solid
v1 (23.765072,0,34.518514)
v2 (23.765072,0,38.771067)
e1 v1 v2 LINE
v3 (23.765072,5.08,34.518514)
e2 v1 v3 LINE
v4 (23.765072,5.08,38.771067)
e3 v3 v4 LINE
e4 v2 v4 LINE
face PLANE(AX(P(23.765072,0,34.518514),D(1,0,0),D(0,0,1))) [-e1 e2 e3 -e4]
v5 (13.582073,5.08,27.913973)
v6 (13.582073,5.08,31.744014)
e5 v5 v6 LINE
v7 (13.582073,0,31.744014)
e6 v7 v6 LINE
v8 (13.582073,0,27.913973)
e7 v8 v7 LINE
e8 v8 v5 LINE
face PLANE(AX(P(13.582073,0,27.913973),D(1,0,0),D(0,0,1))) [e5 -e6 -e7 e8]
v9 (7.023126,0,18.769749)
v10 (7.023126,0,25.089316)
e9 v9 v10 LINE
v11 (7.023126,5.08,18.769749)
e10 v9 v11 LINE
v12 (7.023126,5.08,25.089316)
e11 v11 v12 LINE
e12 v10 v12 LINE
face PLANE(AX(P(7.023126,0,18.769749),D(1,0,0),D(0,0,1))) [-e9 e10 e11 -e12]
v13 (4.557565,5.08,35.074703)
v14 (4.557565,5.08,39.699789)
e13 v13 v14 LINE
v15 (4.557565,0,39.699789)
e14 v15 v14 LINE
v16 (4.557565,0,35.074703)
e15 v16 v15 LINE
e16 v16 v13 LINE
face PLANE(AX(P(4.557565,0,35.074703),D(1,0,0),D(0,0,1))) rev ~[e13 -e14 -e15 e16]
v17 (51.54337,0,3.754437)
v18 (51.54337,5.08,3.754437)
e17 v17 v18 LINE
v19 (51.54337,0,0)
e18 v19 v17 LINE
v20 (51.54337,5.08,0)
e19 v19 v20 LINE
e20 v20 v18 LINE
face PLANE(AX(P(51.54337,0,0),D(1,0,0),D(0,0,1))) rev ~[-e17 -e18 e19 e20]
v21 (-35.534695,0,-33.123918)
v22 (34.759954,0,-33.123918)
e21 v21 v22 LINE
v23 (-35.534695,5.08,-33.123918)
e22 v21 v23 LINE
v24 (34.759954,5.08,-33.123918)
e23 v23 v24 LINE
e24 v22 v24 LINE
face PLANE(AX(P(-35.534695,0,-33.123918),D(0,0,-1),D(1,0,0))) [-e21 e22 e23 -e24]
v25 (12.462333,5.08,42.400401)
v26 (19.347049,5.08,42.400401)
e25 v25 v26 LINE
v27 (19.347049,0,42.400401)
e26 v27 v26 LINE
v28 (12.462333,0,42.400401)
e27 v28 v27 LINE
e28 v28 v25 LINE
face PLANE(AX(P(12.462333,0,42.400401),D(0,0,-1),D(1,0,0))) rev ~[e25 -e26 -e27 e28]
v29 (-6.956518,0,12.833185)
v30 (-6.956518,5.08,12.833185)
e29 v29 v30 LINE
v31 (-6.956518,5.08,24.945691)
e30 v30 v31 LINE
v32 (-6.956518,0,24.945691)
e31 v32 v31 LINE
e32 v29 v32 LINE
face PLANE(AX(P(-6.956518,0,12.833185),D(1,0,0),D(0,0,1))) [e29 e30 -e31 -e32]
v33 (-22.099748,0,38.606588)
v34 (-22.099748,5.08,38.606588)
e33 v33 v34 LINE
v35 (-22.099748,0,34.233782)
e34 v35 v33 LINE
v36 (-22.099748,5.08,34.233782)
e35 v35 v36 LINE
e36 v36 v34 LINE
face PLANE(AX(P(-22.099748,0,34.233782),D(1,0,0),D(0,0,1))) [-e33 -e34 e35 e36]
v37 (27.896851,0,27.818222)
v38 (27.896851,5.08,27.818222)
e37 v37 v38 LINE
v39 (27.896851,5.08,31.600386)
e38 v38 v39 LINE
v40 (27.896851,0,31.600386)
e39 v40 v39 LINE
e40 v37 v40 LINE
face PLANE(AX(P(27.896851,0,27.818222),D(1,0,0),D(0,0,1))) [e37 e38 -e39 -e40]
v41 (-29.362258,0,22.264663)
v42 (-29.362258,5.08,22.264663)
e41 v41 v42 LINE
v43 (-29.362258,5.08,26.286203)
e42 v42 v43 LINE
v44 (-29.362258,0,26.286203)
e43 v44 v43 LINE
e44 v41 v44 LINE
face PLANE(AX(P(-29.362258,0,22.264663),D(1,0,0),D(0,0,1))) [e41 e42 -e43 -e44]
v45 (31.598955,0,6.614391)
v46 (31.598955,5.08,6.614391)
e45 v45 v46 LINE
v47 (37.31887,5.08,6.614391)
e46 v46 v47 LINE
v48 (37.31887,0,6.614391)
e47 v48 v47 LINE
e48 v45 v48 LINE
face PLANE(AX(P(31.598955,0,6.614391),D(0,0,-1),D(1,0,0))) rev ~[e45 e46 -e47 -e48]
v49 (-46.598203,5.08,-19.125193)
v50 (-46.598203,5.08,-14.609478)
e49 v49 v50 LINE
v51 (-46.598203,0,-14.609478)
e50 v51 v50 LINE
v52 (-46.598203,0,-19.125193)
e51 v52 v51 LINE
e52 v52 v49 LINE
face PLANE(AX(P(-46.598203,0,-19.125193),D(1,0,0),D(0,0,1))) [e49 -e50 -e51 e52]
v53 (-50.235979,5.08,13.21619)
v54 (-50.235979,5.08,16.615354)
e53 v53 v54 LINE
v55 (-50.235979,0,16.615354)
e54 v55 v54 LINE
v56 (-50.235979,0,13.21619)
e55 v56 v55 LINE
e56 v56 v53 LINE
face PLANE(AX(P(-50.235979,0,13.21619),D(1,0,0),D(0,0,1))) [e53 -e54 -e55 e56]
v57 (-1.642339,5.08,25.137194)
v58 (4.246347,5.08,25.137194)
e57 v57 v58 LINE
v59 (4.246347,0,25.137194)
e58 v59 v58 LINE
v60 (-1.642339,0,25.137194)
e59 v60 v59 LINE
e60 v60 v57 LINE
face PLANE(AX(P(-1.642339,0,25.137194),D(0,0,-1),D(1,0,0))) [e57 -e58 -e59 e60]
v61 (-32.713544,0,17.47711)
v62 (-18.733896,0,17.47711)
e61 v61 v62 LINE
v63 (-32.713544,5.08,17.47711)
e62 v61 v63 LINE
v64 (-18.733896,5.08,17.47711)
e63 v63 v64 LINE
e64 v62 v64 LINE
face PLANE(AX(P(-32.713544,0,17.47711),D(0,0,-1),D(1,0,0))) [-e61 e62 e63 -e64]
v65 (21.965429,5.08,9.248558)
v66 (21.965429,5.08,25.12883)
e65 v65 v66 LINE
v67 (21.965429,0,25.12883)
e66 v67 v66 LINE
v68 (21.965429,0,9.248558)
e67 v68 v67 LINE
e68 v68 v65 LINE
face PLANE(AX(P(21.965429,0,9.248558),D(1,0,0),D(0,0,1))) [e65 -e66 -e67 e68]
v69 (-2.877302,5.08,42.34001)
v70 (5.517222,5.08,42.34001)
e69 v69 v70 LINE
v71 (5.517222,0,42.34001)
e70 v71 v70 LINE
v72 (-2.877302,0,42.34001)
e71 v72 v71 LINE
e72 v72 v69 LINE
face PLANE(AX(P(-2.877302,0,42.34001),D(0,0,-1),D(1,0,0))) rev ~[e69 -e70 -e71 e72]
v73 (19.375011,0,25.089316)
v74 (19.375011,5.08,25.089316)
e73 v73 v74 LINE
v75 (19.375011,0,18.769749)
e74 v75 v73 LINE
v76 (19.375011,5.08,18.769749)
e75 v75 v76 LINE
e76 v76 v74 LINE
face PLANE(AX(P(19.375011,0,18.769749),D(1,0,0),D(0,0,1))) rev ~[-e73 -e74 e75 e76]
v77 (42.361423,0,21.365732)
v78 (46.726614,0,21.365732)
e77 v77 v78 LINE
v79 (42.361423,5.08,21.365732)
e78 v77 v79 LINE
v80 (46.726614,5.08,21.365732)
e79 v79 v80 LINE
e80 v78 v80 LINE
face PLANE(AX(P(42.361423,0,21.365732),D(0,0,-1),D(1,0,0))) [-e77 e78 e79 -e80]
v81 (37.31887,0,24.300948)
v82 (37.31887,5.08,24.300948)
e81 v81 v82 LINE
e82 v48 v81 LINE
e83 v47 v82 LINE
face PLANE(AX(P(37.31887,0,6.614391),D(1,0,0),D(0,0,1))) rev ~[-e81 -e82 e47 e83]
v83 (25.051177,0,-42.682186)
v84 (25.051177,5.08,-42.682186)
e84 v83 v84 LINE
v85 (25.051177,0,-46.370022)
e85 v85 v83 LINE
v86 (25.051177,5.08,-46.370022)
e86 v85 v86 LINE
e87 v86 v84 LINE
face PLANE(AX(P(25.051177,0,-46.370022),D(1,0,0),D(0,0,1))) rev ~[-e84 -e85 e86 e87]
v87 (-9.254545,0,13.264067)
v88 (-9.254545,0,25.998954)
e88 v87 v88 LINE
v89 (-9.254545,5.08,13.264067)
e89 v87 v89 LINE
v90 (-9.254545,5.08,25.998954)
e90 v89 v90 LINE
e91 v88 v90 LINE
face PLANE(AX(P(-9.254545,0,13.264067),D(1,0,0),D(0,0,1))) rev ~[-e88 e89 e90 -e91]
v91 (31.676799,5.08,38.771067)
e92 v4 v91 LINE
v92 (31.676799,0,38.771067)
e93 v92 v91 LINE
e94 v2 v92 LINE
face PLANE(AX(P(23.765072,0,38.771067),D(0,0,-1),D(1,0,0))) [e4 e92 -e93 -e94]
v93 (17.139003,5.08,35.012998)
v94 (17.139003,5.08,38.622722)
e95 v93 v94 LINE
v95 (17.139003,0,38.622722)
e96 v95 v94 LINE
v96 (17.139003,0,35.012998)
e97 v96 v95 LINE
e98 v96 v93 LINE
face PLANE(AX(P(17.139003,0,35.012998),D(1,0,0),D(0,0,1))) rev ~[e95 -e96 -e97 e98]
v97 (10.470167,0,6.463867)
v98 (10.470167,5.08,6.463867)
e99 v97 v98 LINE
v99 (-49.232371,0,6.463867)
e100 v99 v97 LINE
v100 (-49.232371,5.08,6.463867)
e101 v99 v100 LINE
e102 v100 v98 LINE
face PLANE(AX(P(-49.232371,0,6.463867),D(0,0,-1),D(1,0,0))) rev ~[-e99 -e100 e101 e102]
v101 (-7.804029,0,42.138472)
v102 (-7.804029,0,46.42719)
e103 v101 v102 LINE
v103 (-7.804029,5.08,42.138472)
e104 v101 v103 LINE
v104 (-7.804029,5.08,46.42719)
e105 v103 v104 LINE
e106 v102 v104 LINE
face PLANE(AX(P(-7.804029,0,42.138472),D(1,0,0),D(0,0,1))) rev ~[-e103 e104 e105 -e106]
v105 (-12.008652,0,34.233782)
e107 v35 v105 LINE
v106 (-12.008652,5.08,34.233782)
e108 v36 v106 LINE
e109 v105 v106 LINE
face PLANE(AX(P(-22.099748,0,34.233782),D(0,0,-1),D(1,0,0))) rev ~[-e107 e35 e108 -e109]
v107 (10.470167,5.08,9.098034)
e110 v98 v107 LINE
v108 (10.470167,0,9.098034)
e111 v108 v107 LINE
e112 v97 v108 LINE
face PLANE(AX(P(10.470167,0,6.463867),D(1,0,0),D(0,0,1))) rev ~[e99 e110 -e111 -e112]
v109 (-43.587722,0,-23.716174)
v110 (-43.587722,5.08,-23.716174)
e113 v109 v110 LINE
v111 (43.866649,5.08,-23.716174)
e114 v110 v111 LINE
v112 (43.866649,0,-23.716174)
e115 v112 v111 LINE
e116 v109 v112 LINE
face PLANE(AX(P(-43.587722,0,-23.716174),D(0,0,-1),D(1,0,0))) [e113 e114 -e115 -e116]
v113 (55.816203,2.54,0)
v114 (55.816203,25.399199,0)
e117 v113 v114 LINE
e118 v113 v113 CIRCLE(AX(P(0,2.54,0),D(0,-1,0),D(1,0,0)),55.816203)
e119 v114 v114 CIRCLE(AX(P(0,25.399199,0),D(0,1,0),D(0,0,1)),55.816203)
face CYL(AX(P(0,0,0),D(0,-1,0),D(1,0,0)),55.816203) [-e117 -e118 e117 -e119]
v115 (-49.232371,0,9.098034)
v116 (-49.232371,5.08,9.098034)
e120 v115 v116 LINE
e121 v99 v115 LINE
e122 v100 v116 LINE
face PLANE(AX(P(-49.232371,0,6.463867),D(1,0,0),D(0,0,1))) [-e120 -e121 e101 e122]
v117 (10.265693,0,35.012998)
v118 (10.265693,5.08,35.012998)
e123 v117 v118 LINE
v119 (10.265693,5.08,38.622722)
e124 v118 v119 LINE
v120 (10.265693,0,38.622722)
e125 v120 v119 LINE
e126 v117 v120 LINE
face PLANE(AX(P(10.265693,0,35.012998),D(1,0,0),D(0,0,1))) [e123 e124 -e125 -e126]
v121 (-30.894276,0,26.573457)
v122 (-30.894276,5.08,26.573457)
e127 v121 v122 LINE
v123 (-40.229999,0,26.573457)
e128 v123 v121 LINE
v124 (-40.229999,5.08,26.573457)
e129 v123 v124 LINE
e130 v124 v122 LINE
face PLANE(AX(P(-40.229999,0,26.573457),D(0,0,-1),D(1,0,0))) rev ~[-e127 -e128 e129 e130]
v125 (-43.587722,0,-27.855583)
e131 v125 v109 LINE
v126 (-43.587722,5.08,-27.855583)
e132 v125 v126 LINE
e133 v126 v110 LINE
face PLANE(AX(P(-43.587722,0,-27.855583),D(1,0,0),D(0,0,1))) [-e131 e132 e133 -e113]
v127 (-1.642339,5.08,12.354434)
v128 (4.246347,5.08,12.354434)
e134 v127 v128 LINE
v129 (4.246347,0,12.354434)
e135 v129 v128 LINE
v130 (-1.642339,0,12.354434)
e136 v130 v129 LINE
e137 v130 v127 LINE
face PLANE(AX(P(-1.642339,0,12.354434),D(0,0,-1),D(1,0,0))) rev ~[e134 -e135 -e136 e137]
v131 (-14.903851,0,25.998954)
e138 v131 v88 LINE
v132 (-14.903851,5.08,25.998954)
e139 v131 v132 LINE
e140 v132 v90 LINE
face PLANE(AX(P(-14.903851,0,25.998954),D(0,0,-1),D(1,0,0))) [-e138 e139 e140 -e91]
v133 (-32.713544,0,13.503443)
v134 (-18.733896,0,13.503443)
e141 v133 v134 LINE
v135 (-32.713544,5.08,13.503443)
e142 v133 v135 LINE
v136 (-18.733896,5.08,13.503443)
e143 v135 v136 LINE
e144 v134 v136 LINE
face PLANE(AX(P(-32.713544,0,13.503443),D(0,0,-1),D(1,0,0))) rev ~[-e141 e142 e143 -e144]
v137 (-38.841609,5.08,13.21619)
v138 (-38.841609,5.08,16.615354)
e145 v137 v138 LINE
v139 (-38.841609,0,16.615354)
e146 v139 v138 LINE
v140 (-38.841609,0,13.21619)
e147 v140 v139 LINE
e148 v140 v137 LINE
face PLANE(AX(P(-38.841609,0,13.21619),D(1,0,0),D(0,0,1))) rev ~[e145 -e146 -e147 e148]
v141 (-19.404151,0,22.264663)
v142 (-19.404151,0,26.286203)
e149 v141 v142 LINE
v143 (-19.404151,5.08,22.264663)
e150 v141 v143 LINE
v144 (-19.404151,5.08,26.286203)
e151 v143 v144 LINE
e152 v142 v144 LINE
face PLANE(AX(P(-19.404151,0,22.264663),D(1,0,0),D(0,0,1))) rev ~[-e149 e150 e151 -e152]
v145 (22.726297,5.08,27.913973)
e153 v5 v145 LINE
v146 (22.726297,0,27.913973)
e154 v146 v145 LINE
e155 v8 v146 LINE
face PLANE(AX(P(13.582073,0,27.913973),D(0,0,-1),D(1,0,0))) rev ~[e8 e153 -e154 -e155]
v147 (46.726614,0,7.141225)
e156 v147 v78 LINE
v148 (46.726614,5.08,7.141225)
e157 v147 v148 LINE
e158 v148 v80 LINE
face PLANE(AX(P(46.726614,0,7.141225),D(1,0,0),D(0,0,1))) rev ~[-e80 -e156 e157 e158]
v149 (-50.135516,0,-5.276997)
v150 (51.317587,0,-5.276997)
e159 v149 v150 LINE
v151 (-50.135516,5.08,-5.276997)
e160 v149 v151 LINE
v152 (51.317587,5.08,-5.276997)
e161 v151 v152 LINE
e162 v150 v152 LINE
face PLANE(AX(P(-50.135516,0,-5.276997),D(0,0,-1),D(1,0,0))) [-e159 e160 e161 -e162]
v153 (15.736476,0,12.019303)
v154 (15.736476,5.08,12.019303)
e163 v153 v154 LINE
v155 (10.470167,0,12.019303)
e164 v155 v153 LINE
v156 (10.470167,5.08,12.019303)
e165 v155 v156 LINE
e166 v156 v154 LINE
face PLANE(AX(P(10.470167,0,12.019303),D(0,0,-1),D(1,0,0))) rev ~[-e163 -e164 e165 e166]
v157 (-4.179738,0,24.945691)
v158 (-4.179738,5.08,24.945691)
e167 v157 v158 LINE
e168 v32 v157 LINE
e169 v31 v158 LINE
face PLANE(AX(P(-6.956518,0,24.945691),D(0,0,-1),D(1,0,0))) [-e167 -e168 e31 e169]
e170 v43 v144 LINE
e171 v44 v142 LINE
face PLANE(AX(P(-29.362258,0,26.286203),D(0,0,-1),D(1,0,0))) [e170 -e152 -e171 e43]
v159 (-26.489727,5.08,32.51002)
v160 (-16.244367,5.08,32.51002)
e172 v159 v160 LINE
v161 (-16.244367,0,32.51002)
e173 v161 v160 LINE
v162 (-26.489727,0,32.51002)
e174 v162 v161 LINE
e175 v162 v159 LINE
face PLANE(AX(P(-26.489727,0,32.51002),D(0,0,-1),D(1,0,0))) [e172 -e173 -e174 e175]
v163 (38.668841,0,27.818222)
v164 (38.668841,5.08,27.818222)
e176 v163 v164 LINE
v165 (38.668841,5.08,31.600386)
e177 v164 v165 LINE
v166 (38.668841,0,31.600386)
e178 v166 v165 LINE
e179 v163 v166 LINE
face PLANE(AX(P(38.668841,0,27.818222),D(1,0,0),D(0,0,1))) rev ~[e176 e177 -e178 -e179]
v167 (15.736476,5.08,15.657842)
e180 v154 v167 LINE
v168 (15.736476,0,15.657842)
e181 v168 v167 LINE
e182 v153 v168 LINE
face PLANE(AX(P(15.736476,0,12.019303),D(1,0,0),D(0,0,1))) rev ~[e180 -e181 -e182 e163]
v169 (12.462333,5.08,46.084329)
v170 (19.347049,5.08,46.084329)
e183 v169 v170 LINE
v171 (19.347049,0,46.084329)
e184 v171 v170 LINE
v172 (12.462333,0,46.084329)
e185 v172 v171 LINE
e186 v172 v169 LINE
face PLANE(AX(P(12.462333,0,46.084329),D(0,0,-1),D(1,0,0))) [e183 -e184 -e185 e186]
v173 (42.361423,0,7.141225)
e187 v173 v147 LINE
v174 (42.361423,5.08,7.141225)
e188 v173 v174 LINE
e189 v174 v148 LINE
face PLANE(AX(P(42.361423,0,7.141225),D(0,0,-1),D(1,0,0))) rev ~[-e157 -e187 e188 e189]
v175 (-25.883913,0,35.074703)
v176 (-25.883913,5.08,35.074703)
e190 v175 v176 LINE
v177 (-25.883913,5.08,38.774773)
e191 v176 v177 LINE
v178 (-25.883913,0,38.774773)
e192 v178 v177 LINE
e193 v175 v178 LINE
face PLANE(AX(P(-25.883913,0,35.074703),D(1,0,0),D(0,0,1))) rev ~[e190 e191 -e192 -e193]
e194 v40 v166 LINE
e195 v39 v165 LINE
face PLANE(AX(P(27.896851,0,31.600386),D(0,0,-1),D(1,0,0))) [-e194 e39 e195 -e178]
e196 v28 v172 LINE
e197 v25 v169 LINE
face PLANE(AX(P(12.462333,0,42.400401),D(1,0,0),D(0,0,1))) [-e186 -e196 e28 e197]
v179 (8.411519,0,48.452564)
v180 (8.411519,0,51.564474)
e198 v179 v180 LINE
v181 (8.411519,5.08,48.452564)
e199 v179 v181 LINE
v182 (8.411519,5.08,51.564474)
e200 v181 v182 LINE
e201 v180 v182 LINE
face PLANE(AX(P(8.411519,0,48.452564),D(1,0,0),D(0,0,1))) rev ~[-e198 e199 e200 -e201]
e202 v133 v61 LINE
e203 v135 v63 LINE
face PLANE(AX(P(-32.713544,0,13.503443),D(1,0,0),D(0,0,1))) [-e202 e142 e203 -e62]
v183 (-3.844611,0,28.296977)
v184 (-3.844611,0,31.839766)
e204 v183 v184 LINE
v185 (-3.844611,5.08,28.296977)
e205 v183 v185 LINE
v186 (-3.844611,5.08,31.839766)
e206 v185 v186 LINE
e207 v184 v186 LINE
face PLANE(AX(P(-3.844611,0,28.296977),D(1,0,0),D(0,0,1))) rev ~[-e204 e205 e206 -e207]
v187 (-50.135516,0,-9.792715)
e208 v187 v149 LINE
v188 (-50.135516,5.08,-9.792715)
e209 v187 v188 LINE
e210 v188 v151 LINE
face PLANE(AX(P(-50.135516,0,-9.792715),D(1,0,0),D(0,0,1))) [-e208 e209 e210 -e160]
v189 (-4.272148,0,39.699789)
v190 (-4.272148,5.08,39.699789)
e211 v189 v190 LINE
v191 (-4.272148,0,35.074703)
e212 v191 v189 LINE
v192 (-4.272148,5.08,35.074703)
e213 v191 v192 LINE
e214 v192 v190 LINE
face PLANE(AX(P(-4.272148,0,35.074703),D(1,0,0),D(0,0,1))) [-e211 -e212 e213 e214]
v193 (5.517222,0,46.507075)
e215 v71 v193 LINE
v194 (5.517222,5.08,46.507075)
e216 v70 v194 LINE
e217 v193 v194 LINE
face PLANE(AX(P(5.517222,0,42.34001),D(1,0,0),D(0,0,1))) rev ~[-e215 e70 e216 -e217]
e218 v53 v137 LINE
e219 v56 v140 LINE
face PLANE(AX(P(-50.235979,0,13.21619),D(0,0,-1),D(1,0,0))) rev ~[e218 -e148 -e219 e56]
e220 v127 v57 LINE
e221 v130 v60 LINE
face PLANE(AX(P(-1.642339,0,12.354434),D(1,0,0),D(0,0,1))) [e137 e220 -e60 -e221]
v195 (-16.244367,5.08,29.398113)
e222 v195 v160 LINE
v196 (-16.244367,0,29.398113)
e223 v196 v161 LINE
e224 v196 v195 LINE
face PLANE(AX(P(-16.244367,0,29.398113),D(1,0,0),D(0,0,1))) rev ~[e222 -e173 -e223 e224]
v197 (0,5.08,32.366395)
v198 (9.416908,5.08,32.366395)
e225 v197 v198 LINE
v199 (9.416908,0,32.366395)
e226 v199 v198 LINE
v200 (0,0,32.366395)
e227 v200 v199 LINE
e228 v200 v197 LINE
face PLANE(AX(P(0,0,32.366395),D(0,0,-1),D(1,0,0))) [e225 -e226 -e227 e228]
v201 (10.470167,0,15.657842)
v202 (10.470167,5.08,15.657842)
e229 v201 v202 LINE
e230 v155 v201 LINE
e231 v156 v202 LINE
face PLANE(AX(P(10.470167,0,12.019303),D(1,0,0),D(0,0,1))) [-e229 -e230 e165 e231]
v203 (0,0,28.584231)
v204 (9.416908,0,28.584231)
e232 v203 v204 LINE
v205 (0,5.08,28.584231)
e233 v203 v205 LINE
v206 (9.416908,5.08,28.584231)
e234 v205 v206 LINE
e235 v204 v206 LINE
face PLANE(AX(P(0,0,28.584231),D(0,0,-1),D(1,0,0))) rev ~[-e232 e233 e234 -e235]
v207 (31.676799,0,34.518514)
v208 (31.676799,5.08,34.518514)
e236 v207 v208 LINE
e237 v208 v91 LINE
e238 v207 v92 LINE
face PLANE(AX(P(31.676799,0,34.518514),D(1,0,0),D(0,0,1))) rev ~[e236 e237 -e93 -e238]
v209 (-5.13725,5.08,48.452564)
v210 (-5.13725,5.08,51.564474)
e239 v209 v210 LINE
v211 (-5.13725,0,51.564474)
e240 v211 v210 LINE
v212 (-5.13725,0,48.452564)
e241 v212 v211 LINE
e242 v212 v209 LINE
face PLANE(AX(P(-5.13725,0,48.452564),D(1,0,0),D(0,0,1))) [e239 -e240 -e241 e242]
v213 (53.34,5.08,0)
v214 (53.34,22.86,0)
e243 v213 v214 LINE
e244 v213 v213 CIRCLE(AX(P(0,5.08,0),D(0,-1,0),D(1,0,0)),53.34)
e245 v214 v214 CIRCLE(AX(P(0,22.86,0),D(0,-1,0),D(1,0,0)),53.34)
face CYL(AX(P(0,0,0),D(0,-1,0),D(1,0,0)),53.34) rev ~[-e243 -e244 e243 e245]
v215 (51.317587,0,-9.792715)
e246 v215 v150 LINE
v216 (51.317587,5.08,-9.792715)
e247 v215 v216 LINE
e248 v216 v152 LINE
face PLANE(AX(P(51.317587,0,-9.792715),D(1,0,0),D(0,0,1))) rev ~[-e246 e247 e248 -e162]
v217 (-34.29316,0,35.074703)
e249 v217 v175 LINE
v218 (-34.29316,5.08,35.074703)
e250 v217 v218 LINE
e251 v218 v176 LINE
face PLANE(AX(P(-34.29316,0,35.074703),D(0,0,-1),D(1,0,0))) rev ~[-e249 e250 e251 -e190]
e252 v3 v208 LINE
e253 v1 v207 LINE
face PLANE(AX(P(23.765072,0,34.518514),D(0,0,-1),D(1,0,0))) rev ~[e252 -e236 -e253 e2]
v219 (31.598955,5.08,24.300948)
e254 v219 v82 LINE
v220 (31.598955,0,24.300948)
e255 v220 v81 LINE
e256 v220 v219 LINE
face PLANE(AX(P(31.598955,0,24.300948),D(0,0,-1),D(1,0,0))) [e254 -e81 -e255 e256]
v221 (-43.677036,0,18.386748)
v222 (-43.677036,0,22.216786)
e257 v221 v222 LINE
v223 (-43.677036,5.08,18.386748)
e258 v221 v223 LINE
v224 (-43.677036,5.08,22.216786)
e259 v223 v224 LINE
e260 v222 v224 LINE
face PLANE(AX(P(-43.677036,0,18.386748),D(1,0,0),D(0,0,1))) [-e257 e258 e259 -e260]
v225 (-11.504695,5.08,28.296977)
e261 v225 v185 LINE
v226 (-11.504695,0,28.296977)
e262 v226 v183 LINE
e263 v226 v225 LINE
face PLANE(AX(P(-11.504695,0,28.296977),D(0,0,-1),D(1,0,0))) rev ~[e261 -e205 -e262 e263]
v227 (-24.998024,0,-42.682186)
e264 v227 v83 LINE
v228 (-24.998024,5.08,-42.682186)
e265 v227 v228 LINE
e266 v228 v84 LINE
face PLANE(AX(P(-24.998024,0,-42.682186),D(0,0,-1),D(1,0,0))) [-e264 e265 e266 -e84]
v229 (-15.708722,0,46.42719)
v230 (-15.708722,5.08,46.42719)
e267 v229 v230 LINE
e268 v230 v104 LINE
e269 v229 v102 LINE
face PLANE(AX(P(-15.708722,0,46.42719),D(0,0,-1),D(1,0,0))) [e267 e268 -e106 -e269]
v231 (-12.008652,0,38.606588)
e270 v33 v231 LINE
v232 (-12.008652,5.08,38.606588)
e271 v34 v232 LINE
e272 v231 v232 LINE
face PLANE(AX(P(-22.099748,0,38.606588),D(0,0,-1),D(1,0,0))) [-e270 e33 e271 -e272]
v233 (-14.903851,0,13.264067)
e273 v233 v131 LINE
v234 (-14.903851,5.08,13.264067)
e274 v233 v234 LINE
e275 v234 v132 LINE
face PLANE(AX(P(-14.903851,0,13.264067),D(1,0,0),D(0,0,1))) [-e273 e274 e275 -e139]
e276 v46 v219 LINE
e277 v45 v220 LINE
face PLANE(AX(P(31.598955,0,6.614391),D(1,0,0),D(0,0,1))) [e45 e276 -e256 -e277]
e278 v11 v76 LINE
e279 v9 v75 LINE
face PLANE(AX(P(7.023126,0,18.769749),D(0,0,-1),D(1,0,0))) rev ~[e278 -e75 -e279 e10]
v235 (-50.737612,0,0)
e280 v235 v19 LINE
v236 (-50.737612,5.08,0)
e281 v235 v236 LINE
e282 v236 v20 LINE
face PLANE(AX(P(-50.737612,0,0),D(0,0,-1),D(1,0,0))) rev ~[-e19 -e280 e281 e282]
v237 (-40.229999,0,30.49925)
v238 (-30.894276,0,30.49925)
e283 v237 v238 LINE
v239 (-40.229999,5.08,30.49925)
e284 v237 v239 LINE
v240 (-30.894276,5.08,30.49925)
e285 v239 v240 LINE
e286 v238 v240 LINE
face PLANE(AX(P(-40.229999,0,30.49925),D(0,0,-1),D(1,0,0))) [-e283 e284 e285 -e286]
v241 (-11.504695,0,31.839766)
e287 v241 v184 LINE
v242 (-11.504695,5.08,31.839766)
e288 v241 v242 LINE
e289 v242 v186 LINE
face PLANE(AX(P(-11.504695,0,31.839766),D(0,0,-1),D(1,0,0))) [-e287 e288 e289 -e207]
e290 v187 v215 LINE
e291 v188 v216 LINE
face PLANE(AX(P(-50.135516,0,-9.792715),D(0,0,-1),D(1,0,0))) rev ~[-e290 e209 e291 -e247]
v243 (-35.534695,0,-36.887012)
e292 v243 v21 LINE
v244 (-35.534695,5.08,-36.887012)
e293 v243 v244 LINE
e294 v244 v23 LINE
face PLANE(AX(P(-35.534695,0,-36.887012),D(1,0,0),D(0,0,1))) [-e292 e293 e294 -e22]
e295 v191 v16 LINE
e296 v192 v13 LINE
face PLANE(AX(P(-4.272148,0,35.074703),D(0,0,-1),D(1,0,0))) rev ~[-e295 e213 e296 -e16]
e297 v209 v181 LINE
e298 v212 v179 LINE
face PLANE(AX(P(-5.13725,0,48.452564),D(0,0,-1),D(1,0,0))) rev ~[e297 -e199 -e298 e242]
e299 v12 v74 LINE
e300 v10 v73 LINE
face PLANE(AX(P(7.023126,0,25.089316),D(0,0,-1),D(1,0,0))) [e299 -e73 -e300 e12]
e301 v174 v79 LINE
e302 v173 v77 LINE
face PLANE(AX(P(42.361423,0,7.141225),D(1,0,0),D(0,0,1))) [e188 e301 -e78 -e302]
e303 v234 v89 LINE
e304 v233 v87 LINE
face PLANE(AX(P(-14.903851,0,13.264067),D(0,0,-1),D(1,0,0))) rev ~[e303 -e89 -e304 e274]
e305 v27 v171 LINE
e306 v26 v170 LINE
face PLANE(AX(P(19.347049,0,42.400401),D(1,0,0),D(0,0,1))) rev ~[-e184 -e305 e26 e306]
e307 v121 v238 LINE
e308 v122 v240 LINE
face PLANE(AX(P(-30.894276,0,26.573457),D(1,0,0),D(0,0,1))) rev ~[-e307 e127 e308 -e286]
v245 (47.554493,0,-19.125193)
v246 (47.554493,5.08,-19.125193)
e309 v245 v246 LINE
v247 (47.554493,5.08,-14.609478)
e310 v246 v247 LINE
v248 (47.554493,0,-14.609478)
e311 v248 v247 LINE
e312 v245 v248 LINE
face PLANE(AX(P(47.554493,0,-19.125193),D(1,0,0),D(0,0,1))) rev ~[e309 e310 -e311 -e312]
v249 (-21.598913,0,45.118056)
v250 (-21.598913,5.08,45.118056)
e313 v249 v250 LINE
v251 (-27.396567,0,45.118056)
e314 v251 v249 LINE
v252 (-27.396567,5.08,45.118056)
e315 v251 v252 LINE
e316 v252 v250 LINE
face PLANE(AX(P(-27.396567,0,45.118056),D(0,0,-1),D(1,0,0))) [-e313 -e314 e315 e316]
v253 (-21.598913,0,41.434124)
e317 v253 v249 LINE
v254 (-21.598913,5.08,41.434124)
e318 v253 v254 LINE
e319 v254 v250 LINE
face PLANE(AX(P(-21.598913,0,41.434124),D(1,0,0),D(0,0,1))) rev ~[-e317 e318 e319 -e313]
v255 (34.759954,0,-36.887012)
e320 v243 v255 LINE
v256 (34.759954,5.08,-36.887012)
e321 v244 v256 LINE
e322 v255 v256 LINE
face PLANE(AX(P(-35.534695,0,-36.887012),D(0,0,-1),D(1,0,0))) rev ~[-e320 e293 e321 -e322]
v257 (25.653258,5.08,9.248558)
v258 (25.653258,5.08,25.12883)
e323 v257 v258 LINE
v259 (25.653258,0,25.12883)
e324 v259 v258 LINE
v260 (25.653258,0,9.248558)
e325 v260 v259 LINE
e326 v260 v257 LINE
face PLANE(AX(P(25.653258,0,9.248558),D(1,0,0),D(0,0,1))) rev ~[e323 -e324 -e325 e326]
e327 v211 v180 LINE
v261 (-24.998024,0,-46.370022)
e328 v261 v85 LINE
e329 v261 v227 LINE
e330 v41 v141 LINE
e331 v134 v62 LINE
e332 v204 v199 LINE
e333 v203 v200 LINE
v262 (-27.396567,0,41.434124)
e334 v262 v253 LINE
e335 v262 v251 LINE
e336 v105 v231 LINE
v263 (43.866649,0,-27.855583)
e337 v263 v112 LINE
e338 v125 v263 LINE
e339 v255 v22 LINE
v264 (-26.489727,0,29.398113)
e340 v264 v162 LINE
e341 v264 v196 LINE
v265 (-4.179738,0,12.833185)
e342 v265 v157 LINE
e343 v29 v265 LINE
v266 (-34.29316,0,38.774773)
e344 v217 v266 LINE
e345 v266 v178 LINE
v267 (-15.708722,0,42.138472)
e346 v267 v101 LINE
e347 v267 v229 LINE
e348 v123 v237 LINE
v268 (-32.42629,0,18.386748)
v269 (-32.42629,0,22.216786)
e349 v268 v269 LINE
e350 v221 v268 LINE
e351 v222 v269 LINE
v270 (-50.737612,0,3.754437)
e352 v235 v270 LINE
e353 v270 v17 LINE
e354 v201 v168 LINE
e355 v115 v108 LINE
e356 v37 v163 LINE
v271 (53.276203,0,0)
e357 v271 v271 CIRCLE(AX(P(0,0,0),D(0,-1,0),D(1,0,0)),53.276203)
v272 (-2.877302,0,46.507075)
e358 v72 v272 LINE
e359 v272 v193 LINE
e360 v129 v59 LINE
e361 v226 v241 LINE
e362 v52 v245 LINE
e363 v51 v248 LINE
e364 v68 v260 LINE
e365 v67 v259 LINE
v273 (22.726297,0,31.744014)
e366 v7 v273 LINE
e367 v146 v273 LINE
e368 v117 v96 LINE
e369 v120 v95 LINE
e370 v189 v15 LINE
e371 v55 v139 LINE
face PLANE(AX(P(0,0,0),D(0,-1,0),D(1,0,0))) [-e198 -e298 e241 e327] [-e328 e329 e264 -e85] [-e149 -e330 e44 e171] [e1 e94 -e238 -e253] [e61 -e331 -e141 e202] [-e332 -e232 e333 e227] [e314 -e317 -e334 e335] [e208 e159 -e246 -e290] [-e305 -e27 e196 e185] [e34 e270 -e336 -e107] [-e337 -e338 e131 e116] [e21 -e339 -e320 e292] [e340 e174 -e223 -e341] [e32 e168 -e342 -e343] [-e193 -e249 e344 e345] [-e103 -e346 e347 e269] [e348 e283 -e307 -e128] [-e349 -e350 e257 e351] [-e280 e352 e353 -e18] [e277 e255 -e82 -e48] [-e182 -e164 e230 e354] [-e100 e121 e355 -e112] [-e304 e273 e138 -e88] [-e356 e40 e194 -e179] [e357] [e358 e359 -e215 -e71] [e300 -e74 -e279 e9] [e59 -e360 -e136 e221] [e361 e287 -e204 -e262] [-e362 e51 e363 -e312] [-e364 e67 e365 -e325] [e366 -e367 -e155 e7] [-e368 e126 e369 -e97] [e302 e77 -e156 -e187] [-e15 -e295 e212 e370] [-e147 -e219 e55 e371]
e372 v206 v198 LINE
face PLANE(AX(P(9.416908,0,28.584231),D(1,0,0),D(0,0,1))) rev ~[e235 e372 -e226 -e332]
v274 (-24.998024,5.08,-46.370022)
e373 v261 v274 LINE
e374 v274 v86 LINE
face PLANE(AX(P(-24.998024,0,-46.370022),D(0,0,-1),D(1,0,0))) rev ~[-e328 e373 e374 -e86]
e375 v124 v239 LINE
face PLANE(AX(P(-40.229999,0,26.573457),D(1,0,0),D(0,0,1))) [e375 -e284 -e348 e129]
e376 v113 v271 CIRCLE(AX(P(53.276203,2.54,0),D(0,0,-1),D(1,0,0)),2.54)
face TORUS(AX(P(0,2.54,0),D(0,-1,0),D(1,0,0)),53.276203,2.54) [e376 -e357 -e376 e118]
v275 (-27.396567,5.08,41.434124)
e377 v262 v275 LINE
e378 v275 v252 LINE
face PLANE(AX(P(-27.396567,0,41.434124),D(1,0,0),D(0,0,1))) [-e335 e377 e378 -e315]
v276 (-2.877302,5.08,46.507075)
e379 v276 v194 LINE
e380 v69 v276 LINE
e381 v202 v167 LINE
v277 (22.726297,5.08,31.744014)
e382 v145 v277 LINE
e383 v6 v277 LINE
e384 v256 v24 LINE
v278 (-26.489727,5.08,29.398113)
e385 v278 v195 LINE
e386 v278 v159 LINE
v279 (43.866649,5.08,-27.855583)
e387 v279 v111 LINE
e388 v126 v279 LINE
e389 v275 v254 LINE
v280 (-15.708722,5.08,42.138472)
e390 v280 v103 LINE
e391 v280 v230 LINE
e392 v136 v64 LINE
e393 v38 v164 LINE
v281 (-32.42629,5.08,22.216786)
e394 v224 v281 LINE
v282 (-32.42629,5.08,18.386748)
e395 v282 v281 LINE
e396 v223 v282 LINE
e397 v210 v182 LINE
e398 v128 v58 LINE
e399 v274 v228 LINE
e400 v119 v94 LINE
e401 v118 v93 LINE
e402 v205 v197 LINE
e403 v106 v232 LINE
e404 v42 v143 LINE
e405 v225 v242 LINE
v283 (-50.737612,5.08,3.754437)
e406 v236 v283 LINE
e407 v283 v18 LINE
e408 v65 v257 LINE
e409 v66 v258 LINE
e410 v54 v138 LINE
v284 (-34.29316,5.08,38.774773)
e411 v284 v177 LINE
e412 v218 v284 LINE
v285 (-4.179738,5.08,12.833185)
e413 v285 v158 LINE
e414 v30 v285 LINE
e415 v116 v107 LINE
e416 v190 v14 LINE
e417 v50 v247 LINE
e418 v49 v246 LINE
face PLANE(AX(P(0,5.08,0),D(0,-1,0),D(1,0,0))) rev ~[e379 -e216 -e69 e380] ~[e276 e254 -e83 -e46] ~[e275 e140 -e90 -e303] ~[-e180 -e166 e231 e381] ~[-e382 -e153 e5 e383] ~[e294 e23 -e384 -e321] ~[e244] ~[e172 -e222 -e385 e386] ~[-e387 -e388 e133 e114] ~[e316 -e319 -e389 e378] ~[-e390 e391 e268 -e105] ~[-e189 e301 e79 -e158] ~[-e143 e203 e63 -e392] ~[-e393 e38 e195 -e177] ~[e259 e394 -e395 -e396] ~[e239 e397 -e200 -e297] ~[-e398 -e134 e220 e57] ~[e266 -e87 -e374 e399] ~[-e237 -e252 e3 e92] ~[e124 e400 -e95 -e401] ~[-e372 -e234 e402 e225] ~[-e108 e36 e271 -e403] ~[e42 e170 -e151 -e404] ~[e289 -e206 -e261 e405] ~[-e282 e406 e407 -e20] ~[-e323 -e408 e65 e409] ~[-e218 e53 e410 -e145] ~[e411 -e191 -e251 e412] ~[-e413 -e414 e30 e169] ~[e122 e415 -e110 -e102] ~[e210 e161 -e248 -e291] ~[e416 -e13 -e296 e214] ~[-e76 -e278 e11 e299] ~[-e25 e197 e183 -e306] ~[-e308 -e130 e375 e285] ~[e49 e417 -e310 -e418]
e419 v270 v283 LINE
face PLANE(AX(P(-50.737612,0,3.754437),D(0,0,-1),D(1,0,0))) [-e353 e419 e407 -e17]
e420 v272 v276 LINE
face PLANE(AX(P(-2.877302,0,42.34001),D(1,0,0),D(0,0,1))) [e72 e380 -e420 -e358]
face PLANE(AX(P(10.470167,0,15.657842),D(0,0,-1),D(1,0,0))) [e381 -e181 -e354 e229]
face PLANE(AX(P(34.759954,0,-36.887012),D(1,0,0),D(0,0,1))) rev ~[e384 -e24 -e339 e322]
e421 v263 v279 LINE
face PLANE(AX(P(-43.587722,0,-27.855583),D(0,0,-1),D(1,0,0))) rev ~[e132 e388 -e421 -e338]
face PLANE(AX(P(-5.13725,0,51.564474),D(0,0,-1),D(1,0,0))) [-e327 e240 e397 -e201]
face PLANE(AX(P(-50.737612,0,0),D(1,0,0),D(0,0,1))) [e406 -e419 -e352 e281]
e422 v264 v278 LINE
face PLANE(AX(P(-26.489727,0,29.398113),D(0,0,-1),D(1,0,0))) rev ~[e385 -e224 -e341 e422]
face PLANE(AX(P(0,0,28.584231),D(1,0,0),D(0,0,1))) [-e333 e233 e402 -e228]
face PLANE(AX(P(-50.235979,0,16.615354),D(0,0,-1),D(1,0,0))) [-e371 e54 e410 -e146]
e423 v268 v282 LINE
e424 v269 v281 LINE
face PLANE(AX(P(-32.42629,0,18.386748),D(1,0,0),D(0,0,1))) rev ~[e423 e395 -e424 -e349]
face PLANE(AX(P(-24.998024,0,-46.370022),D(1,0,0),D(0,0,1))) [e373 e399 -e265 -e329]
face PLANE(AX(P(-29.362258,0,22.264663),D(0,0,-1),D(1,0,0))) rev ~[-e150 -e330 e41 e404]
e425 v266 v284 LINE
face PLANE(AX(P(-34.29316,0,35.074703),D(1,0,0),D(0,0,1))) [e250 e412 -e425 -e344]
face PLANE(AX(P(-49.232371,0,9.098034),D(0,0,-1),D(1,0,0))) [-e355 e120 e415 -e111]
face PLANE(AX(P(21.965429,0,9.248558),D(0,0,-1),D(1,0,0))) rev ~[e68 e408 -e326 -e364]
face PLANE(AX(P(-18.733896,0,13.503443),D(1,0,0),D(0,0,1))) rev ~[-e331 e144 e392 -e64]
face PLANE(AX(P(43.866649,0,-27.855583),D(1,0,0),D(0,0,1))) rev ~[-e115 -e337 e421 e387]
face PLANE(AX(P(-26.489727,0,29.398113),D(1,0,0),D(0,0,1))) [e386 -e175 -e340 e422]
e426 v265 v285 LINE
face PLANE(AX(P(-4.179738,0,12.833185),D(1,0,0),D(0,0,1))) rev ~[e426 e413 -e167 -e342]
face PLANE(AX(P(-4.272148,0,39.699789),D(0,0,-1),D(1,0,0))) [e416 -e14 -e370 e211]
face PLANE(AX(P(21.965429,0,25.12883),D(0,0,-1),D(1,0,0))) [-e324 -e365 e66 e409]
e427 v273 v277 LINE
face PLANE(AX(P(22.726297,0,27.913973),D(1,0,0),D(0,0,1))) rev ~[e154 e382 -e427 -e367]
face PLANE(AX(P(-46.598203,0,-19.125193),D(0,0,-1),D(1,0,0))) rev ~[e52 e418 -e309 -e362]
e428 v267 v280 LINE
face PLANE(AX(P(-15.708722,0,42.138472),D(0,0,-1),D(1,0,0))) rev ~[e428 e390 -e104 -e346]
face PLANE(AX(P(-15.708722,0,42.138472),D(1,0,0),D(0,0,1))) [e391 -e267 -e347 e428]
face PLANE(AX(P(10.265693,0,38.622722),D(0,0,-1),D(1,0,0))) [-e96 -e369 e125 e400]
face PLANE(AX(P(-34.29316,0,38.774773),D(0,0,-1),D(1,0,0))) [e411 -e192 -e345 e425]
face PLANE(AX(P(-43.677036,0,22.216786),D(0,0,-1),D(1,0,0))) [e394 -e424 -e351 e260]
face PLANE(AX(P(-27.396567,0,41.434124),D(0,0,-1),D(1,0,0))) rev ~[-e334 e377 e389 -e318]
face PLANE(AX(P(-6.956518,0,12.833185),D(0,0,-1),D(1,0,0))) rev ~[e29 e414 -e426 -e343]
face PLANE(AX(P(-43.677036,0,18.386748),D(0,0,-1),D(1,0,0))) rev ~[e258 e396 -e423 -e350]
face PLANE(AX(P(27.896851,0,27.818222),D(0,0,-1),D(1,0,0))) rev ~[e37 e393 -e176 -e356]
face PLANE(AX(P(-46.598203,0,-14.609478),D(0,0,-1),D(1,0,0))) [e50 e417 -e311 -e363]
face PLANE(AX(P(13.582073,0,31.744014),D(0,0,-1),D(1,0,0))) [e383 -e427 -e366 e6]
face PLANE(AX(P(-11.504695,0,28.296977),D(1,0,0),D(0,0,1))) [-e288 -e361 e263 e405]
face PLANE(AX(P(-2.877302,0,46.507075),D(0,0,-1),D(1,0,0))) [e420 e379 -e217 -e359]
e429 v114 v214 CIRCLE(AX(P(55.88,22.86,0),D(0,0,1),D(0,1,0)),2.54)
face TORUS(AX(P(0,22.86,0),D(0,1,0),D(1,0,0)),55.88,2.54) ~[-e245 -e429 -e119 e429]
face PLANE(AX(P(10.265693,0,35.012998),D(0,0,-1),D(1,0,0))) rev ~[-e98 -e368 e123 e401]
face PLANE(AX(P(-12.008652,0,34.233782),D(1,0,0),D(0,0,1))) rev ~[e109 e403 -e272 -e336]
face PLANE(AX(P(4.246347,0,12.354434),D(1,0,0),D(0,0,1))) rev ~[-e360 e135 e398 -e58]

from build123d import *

# Parameters (mm, degrees)
F0_R     = 55.8162031388
F0_R_2   = 53.34
F1_DEPTH = 25.4
F2_DEPTH = 5.08
F3_W     = 13.5487690568
F3_H     = 3.1119100749
F3_W_2   = 8.3945244551
F3_H_2   = 4.1670650244
F3_W_3   = 7.9046934843
F3_H_3   = 4.2887181044
F3_W_4   = 5.7976543903
F3_H_4   = 3.6839321256
F3_W_5   = 8.4092468023
F3_H_5   = 3.7000700831
F3_W_6   = 10.0910961628
F3_H_6   = 4.372805357
F3_W_7   = 8.8297128677
F3_H_7   = 4.6250857413
F3_W_8   = 6.8733096123
F3_H_8   = 3.6097243428
F3_W_9   = 6.8847164512
F3_H_9   = 3.6839284003
F3_W_10  = 7.9117268324
F3_H_10  = 4.2525529861
F3_W_11  = 10.2453604341
F3_H_11  = 3.1119063497
F3_W_12  = 9.3357227743
F3_H_12  = 3.9257928729
F3_W_13  = 9.9581070244
F3_H_13  = 4.0215402842
F3_W_14  = 13.9796473086
F3_H_14  = 3.9736665785
F3_W_15  = 11.2507455051
F3_H_15  = 3.8300380111
F3_W_16  = 11.3943703473
F3_H_16  = 3.3991634846
F3_W_17  = 7.6600834727
F3_H_17  = 3.5427883267
F3_W_18  = 9.4169080257
F3_H_18  = 3.7821643054
F3_W_19  = 9.1442242265
F3_H_19  = 3.8300417364
F3_W_20  = 10.7719898224
F3_W_21  = 5.6493058801
F3_H_20  = 12.7348862588
F3_W_22  = 2.7767792344
F3_H_21  = 12.112505734
F3_W_23  = 5.8886855841
F3_H_22  = 12.7827599645
F3_W_24  = 12.351885438
F3_H_23  = 6.3195675611
F3_W_25  = 5.2663087845
F3_H_24  = 3.6385394633
F3_W_26  = 3.6878287792
F3_H_25  = 15.8802717924
F3_W_27  = 5.7199150324
F3_H_26  = 17.6865570247
F3_W_28  = 4.3651908636
F3_H_27  = 14.2245069146
F3_W_29  = 59.7025379539
F3_H_28  = 2.6341676712
F3_W_30  = 102.2809818387
F3_H_29  = 3.7544369698
F3_W_31  = 101.4531031251
F3_H_30  = 4.5157186687
F3_W_32  = 50.049200654
F3_H_31  = 3.6878362298
F3_W_33  = 70.2946484089
F3_H_32  = 3.7630945444
F3_W_34  = 87.4543711543
F3_H_33  = 4.1394084692
F3_W_35  = 94.1526964307
F3_H_34  = 4.5157149434
F4_DEPTH = 25.4


# Not quite as in the source:
# - a fillet or chamfer that OpenCascade refuses, or shapes differently, is made with other operations: its cross-section is extruded or revolved along the edge and cut away or added


with BuildPart() as f1:
    # F0 (on Front) → F1 (new body)
    with BuildSketch(Plane.XZ):
        Circle(F0_R)
        Circle(F0_R_2, mode=Mode.SUBTRACT)
    extrude(amount=-F1_DEPTH)

    # F0 (on Front) → F2 (join)
    with BuildSketch(Plane.XZ):
        Circle(F0_R_2)
    extrude(amount=-F2_DEPTH)

    # F3 (on face) → F4 (cut)
    with BuildSketch(Plane.XZ):
        with Locations((1.637134701, 50.0085186213)):
            Rectangle(F3_W, F3_H)
        with Locations((1.3199597597, 44.4235429168)):
            Rectangle(F3_W_2, F3_H_2)
        with Locations((-11.756375432, 44.2828312516)):
            Rectangle(F3_W_3, F3_H_3)
        with Locations((-24.4977399707, 43.2760901749)):
            Rectangle(F3_W_4, F3_H_4)
        with Locations((-30.0885364413, 36.9247384369)):
            Rectangle(F3_W_5, F3_H_5)
        with Locations((-17.0542001724, 36.4201851189)):
            Rectangle(F3_W_6, F3_H_6)
        with Locations((0.1427084208, 37.387246266)):
            Rectangle(F3_W_7, F3_H_7)
        with Locations((13.7023478746, 36.8178598583)):
            Rectangle(F3_W_8, F3_H_8)
        with Locations((15.9046910703, 44.2423652858)):
            Rectangle(F3_W_9, F3_H_9)
        with Locations((27.7209356427, 36.6447903216)):
            Rectangle(F3_W_10, F3_H_10)
        with Locations((-21.367046982, 30.954066664)):
            Rectangle(F3_W_11, F3_H_11)
        with Locations((-35.5621371418, 28.5363532603)):
            Rectangle(F3_W_12, F3_H_12)
        with Locations((-24.3832040578, 24.2754332721)):
            Rectangle(F3_W_13, F3_H_13)
        with Locations((-25.7237199694, 15.490276739)):
            Rectangle(F3_W_14, F3_H_14)
        with Locations((-38.0516629666, 20.3017666936)):
            Rectangle(F3_W_15, F3_H_15)
        with Locations((-44.5387940854, 14.9157717824)):
            Rectangle(F3_W_16, F3_H_16)
        with Locations((-7.6746530831, 30.0683714449)):
            Rectangle(F3_W_17, F3_H_17)
        with Locations((4.7084540129, 30.4753128439)):
            Rectangle(F3_W_18, F3_H_18)
        with Locations((18.1541852653, 29.8289936036)):
            Rectangle(F3_W_19, F3_H_19)
        with Locations((33.2828462124, 29.7093037516)):
            Rectangle(F3_W_20, F3_H_18)
        with Locations((-12.0791979134, 19.6315106004)):
            Rectangle(F3_W_21, F3_H_20)
        with Locations((-5.5681280792, 18.8894383609)):
            Rectangle(F3_W_22, F3_H_21)
        with Locations((1.3020038605, 18.7458135188)):
            Rectangle(F3_W_23, F3_H_22)
        with Locations((13.1990686059, 21.9295322895)):
            Rectangle(F3_W_24, F3_H_23)
        with Locations((13.1033211946, 13.8385724276)):
            Rectangle(F3_W_25, F3_H_24)
        with Locations((23.8093435764, 17.1886943281)):
            Rectangle(F3_W_26, F3_H_25)
        with Locations((34.458912909, 15.457669273)):
            Rectangle(F3_W_27, F3_H_26)
        with Locations((44.544018805, 14.2534784973)):
            Rectangle(F3_W_28, F3_H_27)
        with Locations((-19.3811021745, 7.7809505165)):
            Rectangle(F3_W_29, F3_H_28)
        with Locations((0.4028789699, 1.8772184849)):
            Rectangle(F3_W_30, F3_H_29)
        with Locations((0.5910359323, -7.5348559767)):
            Rectangle(F3_W_31, F3_H_30)
        with Locations((0.026576221, -44.526103884)):
            Rectangle(F3_W_32, F3_H_31)
        with Locations((-0.3873705864, -35.0054651499)):
            Rectangle(F3_W_33, F3_H_32)
        with Locations((0.1394636929, -25.7858783007)):
            Rectangle(F3_W_34, F3_H_33)
        with Locations((0.4781447351, -16.8673358858)):
            Rectangle(F3_W_35, F3_H_34)
    extrude(amount=-F4_DEPTH, mode=Mode.SUBTRACT)

    # F5: fillet of radius 2.54 on 2 edges, made by hand

    # F5_s1 → F5_t2 (revolve, cut)
    with BuildSketch(Plane.XY):
        with BuildLine():
            ThreePointArc((55.8162031388, 2.54), (55.072254363, 0.7439487758), (53.2762031388, 0))
            Line((53.2762031388, 0), (55.8162031388, 0))
            Line((55.8162031388, 0), (55.8162031388, 2.54))
        make_face()
    revolve(axis=Axis((0, 0, 0), (0, -1, 0)), mode=Mode.SUBTRACT)

    # F5_s3 → F5_t4 (revolve, cut)
    with BuildSketch(Plane.XY):
        with BuildLine():
            ThreePointArc((55.88, 25.4), (54.0839487758, 24.6560512242), (53.34, 22.86))
            Line((53.34, 22.86), (53.34, 25.4))
            Line((53.34, 25.4), (55.88, 25.4))
        make_face()
    revolve(axis=Axis((0, 25.4, 0), (0, -1, 0)), mode=Mode.SUBTRACT)


solid = f1.part
